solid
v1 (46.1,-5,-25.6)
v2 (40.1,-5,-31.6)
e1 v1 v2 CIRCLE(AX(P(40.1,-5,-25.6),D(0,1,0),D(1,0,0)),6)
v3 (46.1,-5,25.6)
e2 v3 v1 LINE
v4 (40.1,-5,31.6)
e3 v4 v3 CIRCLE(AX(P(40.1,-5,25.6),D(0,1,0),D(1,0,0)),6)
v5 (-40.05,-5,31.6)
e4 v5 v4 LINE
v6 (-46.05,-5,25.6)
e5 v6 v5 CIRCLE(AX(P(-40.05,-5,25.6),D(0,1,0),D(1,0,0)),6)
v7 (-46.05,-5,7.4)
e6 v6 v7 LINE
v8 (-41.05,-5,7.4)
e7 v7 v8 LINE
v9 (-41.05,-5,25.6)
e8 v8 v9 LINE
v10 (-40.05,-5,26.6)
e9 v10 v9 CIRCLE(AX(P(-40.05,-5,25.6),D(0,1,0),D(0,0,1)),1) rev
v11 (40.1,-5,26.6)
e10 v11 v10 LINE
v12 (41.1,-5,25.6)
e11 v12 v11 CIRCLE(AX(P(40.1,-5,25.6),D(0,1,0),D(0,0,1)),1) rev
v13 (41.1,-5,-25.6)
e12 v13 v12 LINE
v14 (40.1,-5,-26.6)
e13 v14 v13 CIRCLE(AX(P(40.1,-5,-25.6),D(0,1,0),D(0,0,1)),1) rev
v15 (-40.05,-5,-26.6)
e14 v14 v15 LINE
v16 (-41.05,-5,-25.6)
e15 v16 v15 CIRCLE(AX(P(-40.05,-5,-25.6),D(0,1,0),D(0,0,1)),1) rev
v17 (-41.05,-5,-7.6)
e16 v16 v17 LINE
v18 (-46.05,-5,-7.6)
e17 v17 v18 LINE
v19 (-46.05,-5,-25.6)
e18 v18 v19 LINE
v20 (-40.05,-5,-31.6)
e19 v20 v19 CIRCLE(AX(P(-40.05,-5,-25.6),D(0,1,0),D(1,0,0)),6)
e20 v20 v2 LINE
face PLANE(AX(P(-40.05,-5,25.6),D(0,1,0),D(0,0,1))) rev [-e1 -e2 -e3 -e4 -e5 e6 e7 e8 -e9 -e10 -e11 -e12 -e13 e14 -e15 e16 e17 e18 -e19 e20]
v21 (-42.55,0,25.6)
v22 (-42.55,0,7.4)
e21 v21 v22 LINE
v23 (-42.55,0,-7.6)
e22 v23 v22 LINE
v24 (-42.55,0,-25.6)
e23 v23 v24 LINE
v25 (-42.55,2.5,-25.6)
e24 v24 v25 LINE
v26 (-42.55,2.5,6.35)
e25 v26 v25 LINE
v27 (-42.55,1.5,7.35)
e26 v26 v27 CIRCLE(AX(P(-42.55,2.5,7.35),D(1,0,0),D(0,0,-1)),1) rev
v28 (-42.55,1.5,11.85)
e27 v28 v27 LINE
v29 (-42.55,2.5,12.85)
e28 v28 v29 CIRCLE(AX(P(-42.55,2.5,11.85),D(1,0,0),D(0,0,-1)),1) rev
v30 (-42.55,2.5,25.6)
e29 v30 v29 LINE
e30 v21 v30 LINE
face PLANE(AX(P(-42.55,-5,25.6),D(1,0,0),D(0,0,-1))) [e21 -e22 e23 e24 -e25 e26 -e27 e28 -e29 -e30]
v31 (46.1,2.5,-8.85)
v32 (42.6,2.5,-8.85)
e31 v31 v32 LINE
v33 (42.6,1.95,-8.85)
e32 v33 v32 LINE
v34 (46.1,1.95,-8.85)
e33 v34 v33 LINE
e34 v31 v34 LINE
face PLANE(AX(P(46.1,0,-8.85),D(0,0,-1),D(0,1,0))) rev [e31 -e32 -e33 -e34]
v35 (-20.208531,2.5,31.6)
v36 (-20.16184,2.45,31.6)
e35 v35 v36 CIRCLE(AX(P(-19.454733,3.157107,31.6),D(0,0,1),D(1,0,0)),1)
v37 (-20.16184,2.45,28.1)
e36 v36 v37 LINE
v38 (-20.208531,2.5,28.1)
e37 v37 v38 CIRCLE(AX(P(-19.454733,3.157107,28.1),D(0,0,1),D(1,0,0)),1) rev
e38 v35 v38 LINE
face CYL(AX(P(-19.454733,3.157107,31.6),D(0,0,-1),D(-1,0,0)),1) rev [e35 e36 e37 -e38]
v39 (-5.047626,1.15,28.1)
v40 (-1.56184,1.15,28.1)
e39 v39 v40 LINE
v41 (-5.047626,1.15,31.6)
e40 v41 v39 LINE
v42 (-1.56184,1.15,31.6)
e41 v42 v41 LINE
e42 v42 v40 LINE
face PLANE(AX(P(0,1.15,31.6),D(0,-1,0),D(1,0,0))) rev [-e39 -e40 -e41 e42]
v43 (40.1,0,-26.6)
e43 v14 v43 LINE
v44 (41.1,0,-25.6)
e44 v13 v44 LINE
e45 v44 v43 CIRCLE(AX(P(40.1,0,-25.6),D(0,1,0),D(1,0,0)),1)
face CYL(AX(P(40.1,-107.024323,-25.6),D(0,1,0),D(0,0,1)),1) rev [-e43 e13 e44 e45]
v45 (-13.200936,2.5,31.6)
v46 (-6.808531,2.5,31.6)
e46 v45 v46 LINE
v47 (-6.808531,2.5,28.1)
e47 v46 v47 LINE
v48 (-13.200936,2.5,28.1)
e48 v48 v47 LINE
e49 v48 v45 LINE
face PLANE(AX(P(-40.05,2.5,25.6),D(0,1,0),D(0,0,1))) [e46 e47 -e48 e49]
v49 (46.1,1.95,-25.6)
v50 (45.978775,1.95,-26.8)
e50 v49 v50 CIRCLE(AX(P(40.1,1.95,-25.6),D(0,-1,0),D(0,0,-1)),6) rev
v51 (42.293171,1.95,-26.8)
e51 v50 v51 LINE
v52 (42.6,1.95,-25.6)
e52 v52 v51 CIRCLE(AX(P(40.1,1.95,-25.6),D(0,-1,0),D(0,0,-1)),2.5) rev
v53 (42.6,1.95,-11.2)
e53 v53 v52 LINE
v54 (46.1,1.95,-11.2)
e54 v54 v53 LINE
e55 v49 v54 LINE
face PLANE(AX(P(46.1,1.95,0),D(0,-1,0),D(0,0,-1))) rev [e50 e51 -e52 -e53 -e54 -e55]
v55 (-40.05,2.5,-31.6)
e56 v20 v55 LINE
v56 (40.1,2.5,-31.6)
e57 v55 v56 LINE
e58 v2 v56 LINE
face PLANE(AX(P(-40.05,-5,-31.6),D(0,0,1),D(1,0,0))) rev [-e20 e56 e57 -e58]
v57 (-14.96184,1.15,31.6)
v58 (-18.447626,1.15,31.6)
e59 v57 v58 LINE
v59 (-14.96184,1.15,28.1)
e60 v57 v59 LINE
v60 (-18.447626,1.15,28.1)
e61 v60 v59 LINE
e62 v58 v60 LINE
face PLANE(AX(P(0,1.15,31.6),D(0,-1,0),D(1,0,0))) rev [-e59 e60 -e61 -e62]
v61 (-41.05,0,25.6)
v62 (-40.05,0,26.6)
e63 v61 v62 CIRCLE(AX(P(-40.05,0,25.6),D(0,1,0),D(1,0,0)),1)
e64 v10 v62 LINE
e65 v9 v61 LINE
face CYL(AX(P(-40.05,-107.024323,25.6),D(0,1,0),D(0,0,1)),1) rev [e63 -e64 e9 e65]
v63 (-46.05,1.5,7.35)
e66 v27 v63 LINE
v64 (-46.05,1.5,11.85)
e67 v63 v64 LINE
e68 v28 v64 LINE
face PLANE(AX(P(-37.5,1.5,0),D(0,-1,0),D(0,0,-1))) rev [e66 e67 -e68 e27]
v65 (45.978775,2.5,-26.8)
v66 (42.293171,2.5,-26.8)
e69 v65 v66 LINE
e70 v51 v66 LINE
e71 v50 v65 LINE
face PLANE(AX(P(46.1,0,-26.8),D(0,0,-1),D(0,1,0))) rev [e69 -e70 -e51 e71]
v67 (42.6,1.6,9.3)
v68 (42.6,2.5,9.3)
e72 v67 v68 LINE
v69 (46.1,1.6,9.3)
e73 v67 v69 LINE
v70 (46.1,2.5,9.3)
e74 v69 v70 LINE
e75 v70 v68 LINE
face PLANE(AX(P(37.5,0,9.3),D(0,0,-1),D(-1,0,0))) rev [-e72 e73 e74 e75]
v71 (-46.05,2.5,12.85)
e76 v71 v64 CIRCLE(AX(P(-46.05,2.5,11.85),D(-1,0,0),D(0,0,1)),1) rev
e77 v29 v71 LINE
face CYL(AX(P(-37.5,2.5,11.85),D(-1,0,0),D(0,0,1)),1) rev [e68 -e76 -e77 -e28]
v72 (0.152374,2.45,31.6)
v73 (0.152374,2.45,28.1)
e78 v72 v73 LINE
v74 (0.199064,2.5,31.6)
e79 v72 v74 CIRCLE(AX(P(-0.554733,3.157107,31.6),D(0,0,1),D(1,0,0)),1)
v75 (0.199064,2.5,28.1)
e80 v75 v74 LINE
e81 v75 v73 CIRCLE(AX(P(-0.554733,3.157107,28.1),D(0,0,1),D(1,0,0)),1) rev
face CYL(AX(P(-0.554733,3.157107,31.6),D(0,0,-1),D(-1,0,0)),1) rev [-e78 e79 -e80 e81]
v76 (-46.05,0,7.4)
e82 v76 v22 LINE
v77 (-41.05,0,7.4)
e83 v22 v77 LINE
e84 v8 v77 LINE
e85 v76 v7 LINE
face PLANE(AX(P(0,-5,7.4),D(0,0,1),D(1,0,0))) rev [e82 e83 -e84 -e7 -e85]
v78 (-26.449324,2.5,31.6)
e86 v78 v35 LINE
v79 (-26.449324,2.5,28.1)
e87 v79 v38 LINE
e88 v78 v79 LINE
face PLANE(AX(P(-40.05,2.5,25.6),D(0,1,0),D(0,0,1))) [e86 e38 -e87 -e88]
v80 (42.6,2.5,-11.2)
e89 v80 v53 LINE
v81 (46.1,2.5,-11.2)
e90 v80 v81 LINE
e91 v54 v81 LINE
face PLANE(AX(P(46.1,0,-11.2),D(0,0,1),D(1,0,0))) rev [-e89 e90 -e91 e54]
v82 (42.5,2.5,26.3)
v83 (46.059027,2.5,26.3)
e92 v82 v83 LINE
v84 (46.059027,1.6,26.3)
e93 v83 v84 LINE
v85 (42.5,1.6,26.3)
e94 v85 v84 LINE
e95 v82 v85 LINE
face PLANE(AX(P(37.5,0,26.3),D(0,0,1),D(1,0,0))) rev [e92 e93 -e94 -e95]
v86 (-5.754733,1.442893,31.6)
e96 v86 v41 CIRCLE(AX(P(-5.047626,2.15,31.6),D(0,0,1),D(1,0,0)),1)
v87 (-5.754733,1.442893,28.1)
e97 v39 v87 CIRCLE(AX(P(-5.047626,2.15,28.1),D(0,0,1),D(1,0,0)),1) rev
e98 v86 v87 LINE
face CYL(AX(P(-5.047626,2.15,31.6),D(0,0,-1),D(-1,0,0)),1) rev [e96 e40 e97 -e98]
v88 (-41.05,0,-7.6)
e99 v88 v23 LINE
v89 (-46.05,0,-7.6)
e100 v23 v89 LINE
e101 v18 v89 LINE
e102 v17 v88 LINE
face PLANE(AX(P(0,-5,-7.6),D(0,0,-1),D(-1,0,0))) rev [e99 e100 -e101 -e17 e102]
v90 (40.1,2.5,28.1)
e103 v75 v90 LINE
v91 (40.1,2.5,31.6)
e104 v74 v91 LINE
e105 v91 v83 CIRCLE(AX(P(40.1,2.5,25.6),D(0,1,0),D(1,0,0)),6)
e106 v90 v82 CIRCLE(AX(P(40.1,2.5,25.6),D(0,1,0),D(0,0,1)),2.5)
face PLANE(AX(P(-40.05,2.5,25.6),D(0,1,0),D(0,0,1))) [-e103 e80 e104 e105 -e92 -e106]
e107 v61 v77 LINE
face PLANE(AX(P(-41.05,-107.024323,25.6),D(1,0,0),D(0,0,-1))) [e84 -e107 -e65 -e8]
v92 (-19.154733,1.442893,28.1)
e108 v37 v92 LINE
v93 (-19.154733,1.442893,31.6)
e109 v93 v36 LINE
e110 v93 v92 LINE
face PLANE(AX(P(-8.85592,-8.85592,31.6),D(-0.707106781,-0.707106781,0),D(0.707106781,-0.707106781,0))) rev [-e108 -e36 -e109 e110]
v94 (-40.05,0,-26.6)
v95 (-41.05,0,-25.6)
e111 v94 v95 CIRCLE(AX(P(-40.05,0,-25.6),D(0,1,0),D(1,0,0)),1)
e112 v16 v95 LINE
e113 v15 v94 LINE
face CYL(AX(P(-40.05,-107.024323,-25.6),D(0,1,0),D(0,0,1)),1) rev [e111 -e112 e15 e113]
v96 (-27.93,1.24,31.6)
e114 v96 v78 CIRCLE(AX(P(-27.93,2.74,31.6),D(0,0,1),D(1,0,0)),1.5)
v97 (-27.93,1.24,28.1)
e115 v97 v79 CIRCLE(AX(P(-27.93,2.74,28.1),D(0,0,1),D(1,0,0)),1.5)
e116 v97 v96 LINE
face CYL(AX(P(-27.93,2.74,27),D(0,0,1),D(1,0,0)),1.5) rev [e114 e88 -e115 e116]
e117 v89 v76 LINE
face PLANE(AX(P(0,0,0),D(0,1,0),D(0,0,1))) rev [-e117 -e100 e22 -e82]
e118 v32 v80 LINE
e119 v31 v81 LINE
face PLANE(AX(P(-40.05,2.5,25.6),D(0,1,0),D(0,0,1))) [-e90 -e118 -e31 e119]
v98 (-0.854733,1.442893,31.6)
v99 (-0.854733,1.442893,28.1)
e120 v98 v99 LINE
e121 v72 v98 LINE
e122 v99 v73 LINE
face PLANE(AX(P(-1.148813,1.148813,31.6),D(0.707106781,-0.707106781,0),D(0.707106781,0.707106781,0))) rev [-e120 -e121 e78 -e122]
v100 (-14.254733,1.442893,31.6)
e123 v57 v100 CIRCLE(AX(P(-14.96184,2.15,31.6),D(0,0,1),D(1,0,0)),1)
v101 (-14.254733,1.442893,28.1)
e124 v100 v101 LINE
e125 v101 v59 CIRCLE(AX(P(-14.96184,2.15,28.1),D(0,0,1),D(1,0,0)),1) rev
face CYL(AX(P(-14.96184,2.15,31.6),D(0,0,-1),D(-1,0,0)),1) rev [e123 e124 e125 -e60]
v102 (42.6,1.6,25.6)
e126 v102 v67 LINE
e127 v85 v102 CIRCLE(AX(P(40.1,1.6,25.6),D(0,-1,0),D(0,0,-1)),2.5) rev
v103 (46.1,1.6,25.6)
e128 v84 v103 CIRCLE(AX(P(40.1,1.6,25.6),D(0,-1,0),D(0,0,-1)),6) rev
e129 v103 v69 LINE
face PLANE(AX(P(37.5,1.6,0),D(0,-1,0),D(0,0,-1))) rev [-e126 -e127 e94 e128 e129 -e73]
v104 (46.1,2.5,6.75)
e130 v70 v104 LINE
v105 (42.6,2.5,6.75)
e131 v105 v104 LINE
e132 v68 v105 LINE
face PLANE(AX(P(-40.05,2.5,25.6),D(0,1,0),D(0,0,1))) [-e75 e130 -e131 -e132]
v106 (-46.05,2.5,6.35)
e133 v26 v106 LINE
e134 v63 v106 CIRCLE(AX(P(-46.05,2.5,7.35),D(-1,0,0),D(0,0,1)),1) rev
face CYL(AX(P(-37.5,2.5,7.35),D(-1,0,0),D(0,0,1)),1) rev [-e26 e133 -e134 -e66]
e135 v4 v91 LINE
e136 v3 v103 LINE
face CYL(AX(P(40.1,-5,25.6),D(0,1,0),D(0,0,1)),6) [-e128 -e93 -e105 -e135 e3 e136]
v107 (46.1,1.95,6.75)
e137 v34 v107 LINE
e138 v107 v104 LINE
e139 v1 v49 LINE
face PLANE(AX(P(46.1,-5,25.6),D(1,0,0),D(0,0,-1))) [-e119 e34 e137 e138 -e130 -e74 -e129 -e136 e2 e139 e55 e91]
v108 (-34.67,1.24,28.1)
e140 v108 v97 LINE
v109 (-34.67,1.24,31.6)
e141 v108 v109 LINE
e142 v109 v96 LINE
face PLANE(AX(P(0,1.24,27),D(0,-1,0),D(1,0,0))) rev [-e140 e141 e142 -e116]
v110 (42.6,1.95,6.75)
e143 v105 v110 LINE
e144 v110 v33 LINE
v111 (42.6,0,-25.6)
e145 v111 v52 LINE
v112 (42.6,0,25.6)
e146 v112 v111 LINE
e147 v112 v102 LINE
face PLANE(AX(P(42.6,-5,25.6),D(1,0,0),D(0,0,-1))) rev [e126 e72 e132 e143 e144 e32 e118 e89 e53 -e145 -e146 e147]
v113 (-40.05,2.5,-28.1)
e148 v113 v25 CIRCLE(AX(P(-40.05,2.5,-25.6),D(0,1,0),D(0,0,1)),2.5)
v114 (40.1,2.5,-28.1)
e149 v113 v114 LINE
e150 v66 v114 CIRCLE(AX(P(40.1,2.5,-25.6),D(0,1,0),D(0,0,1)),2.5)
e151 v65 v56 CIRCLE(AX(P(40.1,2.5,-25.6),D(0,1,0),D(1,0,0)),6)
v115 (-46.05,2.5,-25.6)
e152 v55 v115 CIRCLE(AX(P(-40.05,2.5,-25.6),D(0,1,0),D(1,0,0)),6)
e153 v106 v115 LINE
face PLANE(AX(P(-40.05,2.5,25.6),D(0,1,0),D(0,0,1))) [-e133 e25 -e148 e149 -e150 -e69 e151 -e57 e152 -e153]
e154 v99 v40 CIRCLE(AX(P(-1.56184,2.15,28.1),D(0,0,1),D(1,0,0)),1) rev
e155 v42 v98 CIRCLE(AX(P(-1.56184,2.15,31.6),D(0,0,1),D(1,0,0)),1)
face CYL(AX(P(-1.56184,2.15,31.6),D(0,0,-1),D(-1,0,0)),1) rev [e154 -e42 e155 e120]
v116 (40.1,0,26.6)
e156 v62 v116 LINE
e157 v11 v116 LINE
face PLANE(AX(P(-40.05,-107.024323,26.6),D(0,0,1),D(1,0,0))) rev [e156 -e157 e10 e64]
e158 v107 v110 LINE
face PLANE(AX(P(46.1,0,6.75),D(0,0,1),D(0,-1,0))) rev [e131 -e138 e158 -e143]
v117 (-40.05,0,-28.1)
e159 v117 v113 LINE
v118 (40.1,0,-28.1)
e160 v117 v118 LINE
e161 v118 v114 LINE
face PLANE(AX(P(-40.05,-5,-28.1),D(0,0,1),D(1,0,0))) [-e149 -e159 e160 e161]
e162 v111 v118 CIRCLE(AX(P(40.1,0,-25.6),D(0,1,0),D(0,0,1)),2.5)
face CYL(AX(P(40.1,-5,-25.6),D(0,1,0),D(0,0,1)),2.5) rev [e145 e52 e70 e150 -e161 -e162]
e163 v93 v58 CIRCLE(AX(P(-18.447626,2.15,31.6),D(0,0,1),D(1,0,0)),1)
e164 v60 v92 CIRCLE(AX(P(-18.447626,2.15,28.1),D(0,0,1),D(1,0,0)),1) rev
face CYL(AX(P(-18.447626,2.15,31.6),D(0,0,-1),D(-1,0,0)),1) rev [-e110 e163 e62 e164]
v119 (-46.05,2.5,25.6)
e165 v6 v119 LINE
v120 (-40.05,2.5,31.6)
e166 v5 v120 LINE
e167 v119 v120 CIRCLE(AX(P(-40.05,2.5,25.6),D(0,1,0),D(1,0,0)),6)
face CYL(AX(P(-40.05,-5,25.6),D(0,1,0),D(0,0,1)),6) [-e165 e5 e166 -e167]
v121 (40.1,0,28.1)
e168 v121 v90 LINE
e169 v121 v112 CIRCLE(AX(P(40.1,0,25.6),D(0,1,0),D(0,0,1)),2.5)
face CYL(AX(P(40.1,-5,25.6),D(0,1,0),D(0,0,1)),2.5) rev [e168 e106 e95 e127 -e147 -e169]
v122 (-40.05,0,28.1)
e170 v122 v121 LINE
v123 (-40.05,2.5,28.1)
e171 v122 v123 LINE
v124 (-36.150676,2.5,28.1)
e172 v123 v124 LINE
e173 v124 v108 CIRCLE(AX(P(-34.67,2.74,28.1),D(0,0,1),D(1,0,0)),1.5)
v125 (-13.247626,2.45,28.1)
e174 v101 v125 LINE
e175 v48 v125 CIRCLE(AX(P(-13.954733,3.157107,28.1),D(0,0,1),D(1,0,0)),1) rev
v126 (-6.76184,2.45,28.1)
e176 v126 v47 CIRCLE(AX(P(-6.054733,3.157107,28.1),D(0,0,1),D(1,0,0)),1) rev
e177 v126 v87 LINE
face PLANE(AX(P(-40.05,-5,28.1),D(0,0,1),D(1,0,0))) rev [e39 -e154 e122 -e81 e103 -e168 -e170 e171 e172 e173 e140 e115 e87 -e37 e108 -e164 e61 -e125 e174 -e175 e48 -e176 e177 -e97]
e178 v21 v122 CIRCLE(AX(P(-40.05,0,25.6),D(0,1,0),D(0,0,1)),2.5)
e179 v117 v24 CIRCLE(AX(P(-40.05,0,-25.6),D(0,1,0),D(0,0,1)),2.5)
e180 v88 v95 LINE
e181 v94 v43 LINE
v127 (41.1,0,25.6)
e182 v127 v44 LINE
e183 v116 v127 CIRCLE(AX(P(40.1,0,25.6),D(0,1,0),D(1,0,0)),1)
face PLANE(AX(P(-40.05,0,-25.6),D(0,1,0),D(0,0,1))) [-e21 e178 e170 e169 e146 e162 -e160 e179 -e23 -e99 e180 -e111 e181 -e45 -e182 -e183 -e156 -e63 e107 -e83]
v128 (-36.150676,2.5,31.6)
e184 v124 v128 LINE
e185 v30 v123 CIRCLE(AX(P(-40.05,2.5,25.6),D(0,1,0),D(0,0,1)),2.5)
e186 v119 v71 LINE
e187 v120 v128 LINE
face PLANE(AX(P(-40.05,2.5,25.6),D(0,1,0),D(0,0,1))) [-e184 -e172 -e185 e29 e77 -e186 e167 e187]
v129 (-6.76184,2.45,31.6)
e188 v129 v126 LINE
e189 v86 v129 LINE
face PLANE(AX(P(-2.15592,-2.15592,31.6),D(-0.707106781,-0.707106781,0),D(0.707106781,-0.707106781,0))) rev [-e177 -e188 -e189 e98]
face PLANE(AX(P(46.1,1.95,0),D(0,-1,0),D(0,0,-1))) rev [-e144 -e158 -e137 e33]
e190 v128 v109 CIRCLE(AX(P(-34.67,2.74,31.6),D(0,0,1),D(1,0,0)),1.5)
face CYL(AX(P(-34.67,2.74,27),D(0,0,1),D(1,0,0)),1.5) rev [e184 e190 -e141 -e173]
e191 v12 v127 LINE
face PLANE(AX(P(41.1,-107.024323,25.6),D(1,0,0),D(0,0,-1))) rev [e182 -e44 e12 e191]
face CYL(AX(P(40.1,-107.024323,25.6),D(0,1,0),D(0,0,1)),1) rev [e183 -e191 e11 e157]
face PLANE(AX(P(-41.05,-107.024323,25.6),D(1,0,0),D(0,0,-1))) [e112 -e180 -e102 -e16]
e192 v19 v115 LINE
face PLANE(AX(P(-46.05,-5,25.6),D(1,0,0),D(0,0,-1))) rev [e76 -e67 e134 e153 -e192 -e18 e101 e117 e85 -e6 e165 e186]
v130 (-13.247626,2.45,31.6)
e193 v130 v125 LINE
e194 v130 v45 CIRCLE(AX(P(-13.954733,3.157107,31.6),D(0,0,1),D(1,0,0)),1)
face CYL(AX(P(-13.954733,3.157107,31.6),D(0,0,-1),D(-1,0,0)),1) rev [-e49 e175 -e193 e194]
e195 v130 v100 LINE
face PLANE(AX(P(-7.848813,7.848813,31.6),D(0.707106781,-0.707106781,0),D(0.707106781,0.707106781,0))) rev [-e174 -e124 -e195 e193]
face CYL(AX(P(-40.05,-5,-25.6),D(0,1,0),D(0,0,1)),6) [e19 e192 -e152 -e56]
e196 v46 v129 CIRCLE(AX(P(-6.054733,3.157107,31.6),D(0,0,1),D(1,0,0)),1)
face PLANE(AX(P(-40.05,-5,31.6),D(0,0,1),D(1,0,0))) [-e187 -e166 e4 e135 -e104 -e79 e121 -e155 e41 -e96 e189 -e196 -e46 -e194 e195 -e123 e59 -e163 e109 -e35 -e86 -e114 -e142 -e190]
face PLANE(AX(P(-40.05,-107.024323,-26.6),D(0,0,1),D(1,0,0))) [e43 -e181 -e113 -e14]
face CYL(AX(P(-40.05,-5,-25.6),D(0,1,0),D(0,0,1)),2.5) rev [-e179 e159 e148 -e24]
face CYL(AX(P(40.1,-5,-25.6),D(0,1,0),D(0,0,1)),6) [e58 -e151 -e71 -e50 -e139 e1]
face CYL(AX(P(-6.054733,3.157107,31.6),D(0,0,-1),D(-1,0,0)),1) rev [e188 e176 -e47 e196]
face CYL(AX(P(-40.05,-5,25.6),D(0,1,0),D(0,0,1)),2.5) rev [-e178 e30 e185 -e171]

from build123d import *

# Parameters (mm, degrees)
EXTRUDE_THIN1_DEPTH      = 2.5
EXTRUDE_THIN1_DEPTH_BACK = 5
EXTRUDE_THIN2_START      = -5
EXTRUDE_THIN2_DEPTH      = 5
CUT_EXTRUDE3_DEPTH       = 76.51403843
CUT_EXTRUDE3_DEPTH_BACK  = 1
CUT_EXTRUDE4_START       = -0.20682878
CUT_EXTRUDE4_OUTLINE_W   = 17
CUT_EXTRUDE4_OUTLINE_H   = 0.9
CUT_EXTRUDE4_OUTLINE_W_2 = 15.6
CUT_EXTRUDE4_OUTLINE_H_2 = 0.55
CUT_EXTRUDE4_DEPTH       = 3.80682878
SKETCH10_W               = 10
SKETCH10_H               = 15
CUT_EXTRUDE6_DEPTH       = 57.113902021
CUT_EXTRUDE11_DEPTH      = 95.199363055
CUT_EXTRUDE11_DEPTH_BACK = 5


# Read off the part's stored shape, not the designer's step: Cut-Extrude4
with BuildPart() as part:
    # Sketch1 → Extrude-Thin1 (new, two sides: drawn at the far end of the back side and taken through both)
    with BuildSketch(Plane(origin=(0, 0, 0), x_dir=(1, 0, 0), z_dir=(0, 1, 0)).offset(-EXTRUDE_THIN1_DEPTH_BACK)):
        with BuildLine():
            Line((-46.05, 25.6), (-46.05, -25.6))
            ThreePointArc((-46.05, -25.6), (-44.292640687, -29.842640687), (-40.05, -31.6))
            Line((-40.05, -31.6), (40.1, -31.6))
            ThreePointArc((40.1, -31.6), (44.342640687, -29.842640687), (46.1, -25.6))
            Line((46.1, -25.6), (46.1, 25.6))
            ThreePointArc((46.1, 25.6), (44.342640687, 29.842640687), (40.1, 31.6))
            Line((40.1, 31.6), (-40.05, 31.6))
            ThreePointArc((-40.05, 31.6), (-44.292640687, 29.842640687), (-46.05, 25.6))
        make_face()
        with BuildLine():
            Line((-42.55, 25.6), (-42.55, -25.6))
            ThreePointArc((-42.55, -25.6), (-41.817766953, -27.367766953), (-40.05, -28.1))
            Line((-40.05, -28.1), (40.1, -28.1))
            ThreePointArc((40.1, -28.1), (41.867766953, -27.367766953), (42.6, -25.6))
            Line((42.6, -25.6), (42.6, 25.6))
            ThreePointArc((42.6, 25.6), (41.867766953, 27.367766953), (40.1, 28.1))
            Line((40.1, 28.1), (-40.05, 28.1))
            ThreePointArc((-40.05, 28.1), (-41.817766953, 27.367766953), (-42.55, 25.6))
        make_face(mode=Mode.SUBTRACT)
    extrude(amount=EXTRUDE_THIN1_DEPTH + EXTRUDE_THIN1_DEPTH_BACK)

    # Sketch1<3> → Extrude-Thin2 (add)
    with BuildSketch(Plane(origin=(0, 0, 0), x_dir=(1, 0, 0), z_dir=(0, 1, 0)).offset(EXTRUDE_THIN2_START)):
        with BuildLine():
            Line((-42.55, 25.6), (-42.55, -25.6))
            ThreePointArc((-42.55, -25.6), (-41.817766953, -27.367766953), (-40.05, -28.1))
            Line((-40.05, -28.1), (40.1, -28.1))
            ThreePointArc((40.1, -28.1), (41.867766953, -27.367766953), (42.6, -25.6))
            Line((42.6, -25.6), (42.6, 25.6))
            ThreePointArc((42.6, 25.6), (41.867766953, 27.367766953), (40.1, 28.1))
            Line((40.1, 28.1), (-40.05, 28.1))
            ThreePointArc((-40.05, 28.1), (-41.817766953, 27.367766953), (-42.55, 25.6))
        make_face()
        with BuildLine():
            Line((-41.05, 25.6), (-41.05, -25.6))
            ThreePointArc((-41.05, -25.6), (-40.757106781, -26.307106781), (-40.05, -26.6))
            Line((-40.05, -26.6), (40.1, -26.6))
            ThreePointArc((40.1, -26.6), (40.807106781, -26.307106781), (41.1, -25.6))
            Line((41.1, -25.6), (41.1, 25.6))
            ThreePointArc((41.1, 25.6), (40.807106781, 26.307106781), (40.1, 26.6))
            Line((40.1, 26.6), (-40.05, 26.6))
            ThreePointArc((-40.05, 26.6), (-40.757106781, 26.307106781), (-41.05, 25.6))
        make_face(mode=Mode.SUBTRACT)
    extrude(amount=EXTRUDE_THIN2_DEPTH)

    # Sketch5 → Cut-Extrude3 (cut, two sides: drawn at the far end of the back side and taken through both)
    with BuildSketch(Plane.XY.offset(28).offset(-CUT_EXTRUDE3_DEPTH_BACK)):
        with BuildLine():
            Line((-26.43, 3.5), (-36.17, 3.5))
            Line((-36.17, 3.5), (-36.17, 2.74))
            ThreePointArc((-36.17, 2.74), (-35.730660172, 1.679339828), (-34.67, 1.24))
            Line((-34.67, 1.24), (-27.93, 1.24))
            ThreePointArc((-27.93, 1.24), (-26.869339828, 1.679339828), (-26.43, 2.74))
            Line((-26.43, 2.74), (-26.43, 3.5))
        make_face()
        with BuildLine():
            Line((-12.954733256, 3.5), (-20.454733256, 3.5))
            Line((-20.454733256, 3.5), (-20.454733256, 3.157106781))
            ThreePointArc((-20.454733256, 3.157106781), (-20.378612788, 2.774423349), (-20.161840037, 2.45))
            Line((-20.161840037, 2.45), (-19.154733256, 1.442893219))
            ThreePointArc((-19.154733256, 1.442893219), (-18.830309907, 1.226120467), (-18.447626475, 1.15))
            Line((-18.447626475, 1.15), (-14.961840037, 1.15))
            ThreePointArc((-14.961840037, 1.15), (-14.579156605, 1.226120467), (-14.254733256, 1.442893219))
            Line((-14.254733256, 1.442893219), (-13.247626475, 2.45))
            ThreePointArc((-13.247626475, 2.45), (-13.030853723, 2.774423349), (-12.954733256, 3.157106781))
            Line((-12.954733256, 3.157106781), (-12.954733256, 3.5))
        make_face()
        with BuildLine():
            Line((0.445266744, 3.5), (-7.054733256, 3.5))
            Line((-7.054733256, 3.5), (-7.054733256, 3.157106781))
            ThreePointArc((-7.054733256, 3.157106781), (-6.978612788, 2.774423349), (-6.761840037, 2.45))
            Line((-6.761840037, 2.45), (-5.754733256, 1.442893219))
            ThreePointArc((-5.754733256, 1.442893219), (-5.430309907, 1.226120467), (-5.047626475, 1.15))
            Line((-5.047626475, 1.15), (-1.561840037, 1.15))
            ThreePointArc((-1.561840037, 1.15), (-1.179156605, 1.226120467), (-0.854733256, 1.442893219))
            Line((-0.854733256, 1.442893219), (0.152373525, 2.45))
            ThreePointArc((0.152373525, 2.45), (0.369146277, 2.774423349), (0.445266744, 3.157106781))
            Line((0.445266744, 3.157106781), (0.445266744, 3.5))
        make_face()
    extrude(amount=CUT_EXTRUDE3_DEPTH + CUT_EXTRUDE3_DEPTH_BACK, mode=Mode.SUBTRACT)

    # Cut-Extrude4 outline → Cut-Extrude4 (cut)
    with BuildSketch(Plane(origin=(42.5, 0, 0), x_dir=(0, 0, -1), z_dir=(1, 0, 0)).offset(CUT_EXTRUDE4_START)):
        with Locations((-17.8, 2.05)):
            Rectangle(CUT_EXTRUDE4_OUTLINE_W, CUT_EXTRUDE4_OUTLINE_H)
        with Locations((19, 2.225)):
            Rectangle(CUT_EXTRUDE4_OUTLINE_W_2, CUT_EXTRUDE4_OUTLINE_H_2)
        with Locations((1.05, 2.225)):
            Rectangle(CUT_EXTRUDE4_OUTLINE_W_2, CUT_EXTRUDE4_OUTLINE_H_2)
    extrude(amount=CUT_EXTRUDE4_DEPTH, mode=Mode.SUBTRACT)

    # Sketch10 → Cut-Extrude6 (cut, through all)
    with BuildSketch(Plane(origin=(0, 0, 0), x_dir=(1, 0, 0), z_dir=(0, 1, 0))):
        with Locations((-46.05, 0.1)):
            Rectangle(SKETCH10_W, SKETCH10_H)
    extrude(amount=-CUT_EXTRUDE6_DEPTH, mode=Mode.SUBTRACT)

    # Sketch11 → Cut-Extrude11 (cut, two sides: drawn at the far end of the back side and taken through both)
    with BuildSketch(Plane.ZY.offset(42.5).offset(-CUT_EXTRUDE11_DEPTH_BACK)):
        with BuildLine():
            ThreePointArc((6.35, 2.5), (6.642893219, 1.792893219), (7.35, 1.5))
            Line((7.35, 1.5), (11.85, 1.5))
            ThreePointArc((11.85, 1.5), (12.557106781, 1.792893219), (12.85, 2.5))
            Line((12.85, 2.5), (6.35, 2.5))
        make_face()
    extrude(amount=CUT_EXTRUDE11_DEPTH + CUT_EXTRUDE11_DEPTH_BACK, mode=Mode.SUBTRACT)


solid = part.part
